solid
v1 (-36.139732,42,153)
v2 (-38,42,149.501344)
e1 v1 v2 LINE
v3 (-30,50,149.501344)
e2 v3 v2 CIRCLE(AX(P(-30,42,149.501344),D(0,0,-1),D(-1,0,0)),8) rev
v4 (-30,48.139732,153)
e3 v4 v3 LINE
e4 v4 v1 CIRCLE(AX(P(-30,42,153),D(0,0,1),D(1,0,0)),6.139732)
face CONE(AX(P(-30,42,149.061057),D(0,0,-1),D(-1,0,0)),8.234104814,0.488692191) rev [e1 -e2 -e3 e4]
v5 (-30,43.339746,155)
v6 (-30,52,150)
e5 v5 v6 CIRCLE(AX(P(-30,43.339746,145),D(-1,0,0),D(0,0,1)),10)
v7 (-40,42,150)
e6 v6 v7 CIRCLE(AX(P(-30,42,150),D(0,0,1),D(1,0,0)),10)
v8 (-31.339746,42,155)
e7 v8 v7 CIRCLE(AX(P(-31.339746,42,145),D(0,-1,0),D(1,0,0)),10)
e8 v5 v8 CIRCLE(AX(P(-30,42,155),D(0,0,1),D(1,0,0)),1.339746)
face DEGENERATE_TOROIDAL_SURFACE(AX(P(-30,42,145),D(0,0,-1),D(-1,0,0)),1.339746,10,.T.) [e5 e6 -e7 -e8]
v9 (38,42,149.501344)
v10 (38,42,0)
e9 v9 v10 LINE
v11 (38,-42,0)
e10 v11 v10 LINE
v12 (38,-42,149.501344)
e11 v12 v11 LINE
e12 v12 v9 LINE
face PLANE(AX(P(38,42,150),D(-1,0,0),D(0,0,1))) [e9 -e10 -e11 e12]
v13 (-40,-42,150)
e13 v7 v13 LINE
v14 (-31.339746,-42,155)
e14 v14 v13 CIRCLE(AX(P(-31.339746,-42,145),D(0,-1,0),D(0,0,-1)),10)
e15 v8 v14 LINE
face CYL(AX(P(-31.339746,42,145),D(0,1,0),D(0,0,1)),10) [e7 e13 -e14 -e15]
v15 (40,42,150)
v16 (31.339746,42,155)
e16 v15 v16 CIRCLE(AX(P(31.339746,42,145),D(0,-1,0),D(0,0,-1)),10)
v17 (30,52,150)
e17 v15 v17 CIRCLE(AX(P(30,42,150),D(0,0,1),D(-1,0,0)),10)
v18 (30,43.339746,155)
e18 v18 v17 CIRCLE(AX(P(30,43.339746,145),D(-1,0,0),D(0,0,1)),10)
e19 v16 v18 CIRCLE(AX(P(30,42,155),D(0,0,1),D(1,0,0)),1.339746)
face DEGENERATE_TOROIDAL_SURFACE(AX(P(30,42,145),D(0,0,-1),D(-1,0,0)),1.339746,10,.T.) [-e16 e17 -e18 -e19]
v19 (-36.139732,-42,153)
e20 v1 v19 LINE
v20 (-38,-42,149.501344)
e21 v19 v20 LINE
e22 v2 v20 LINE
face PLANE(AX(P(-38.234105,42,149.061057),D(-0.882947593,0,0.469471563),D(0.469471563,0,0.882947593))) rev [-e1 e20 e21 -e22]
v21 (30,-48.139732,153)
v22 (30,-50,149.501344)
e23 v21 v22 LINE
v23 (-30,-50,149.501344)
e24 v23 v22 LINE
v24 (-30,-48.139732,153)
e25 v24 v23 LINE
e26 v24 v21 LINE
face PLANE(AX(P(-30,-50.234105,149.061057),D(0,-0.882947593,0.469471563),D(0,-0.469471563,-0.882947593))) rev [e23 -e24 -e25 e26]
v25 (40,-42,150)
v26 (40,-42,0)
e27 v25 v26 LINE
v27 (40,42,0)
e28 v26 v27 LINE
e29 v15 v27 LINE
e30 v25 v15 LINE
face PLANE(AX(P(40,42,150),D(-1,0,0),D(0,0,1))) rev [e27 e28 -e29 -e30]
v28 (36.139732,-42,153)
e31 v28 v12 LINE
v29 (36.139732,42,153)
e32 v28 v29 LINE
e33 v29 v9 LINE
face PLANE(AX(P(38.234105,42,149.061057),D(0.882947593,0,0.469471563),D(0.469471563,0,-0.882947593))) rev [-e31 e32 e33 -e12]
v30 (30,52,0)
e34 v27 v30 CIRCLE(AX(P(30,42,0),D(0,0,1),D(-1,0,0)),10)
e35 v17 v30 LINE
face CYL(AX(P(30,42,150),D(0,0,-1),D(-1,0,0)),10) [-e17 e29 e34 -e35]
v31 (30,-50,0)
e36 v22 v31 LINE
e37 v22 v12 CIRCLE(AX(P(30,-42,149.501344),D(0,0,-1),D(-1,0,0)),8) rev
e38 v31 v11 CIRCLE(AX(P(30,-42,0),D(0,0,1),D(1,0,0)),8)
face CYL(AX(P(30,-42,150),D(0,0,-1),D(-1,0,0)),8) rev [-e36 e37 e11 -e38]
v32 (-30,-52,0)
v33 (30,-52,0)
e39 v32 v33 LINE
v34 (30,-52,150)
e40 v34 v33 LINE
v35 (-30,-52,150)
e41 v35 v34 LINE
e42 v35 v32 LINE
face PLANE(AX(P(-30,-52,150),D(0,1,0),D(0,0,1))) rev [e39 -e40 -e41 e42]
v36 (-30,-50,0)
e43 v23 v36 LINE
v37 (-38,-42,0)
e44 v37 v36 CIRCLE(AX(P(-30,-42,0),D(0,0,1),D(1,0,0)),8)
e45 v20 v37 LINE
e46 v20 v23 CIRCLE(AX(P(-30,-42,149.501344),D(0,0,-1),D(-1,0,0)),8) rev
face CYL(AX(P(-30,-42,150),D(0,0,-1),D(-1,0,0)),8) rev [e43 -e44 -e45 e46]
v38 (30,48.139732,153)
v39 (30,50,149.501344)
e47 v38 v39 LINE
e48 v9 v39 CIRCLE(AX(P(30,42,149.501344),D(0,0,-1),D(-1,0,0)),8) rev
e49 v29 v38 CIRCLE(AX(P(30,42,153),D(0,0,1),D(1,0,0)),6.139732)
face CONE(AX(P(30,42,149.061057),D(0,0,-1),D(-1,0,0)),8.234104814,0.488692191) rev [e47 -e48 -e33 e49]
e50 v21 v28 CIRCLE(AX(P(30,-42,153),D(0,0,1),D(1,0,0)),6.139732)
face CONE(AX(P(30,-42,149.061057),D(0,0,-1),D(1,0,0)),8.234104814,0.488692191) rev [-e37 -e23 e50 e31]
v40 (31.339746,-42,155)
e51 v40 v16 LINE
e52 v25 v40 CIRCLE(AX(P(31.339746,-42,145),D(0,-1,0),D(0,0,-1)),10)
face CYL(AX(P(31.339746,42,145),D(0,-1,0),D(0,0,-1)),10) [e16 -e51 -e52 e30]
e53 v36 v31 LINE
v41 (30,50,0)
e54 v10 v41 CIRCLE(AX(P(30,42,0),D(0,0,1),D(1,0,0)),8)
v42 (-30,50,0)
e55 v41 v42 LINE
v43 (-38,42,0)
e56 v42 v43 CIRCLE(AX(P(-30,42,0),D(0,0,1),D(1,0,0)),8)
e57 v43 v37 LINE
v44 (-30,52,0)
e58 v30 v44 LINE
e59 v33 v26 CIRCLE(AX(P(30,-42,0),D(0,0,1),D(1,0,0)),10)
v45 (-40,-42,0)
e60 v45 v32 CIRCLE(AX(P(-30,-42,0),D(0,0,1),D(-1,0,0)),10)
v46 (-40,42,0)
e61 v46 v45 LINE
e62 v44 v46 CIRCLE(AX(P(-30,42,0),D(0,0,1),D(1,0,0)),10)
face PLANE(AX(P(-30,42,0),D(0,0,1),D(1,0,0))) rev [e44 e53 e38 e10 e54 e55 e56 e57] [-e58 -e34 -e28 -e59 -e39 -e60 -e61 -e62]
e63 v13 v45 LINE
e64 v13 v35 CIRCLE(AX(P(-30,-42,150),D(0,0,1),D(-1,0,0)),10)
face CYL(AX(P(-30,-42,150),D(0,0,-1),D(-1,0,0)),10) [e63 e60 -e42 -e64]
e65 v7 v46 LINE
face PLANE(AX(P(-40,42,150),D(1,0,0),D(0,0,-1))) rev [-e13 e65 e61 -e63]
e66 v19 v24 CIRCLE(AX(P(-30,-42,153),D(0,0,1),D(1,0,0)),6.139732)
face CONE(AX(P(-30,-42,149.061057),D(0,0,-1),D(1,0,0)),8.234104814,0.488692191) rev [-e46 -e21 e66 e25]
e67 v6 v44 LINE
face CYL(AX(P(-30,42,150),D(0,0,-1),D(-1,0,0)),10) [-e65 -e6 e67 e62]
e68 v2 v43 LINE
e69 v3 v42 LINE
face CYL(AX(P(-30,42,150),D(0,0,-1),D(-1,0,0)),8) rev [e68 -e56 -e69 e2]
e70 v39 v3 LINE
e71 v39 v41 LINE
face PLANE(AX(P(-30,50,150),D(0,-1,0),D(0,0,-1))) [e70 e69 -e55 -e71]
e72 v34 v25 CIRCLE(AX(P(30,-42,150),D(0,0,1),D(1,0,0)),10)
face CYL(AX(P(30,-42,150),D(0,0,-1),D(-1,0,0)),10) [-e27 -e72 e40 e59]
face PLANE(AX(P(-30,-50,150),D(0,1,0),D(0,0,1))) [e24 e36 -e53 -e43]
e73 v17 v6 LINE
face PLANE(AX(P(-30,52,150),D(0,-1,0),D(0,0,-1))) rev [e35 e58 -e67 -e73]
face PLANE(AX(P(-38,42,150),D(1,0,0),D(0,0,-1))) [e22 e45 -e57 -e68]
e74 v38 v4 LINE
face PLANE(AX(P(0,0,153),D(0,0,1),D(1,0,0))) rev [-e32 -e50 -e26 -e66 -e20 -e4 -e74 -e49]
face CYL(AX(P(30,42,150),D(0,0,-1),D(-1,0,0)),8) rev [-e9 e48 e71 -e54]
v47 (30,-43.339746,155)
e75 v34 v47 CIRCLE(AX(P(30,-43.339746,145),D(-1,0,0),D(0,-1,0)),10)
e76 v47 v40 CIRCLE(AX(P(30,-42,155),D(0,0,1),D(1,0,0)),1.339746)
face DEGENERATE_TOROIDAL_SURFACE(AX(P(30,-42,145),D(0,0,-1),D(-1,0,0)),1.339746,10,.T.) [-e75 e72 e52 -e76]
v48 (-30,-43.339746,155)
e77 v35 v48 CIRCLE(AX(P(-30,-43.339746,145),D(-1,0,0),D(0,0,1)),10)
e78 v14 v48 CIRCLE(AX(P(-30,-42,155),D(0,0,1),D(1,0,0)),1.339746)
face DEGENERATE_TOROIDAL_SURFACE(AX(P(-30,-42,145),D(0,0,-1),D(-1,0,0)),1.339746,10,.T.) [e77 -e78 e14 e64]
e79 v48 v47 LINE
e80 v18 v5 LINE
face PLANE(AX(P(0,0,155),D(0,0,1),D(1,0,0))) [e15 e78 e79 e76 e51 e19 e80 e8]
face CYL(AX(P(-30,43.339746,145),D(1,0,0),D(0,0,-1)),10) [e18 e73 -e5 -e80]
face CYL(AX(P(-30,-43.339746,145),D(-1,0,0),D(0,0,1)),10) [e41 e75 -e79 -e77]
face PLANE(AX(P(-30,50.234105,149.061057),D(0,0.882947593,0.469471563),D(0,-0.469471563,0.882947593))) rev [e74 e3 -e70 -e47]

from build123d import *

# Parameters (mm, degrees)
EXTRUDE_1_DEPTH = 150
EXTRUDE_3_DEPTH = 5
EXTRUDE_3_TAPER = 28
SHELL_9_T       = -2
FILLET_22_R     = 10


with BuildPart() as part:
    # 草圖1 → 填料-伸長1 (new body)
    with BuildSketch(Plane.XY):
        with BuildLine():
            Line((-30, 52), (30, 52))
            ThreePointArc((30, 52), (37.071067812, 49.071067812), (40, 42))
            Line((40, 42), (40, -42))
            ThreePointArc((40, -42), (37.071067812, -49.071067812), (30, -52))
            Line((30, -52), (-30, -52))
            ThreePointArc((-30, -52), (-37.071067812, -49.071067812), (-40, -42))
            Line((-40, -42), (-40, 42))
            ThreePointArc((-40, 42), (-37.071067812, 49.071067812), (-30, 52))
        make_face()
    extrude(amount=EXTRUDE_1_DEPTH)

    # 草圖3 → 填料-伸長3 (add)
    with BuildSketch(Plane.XY.offset(150)):
        with BuildLine():
            ThreePointArc((-30, 52), (-37.071067812, 49.071067812), (-40, 42))
            Line((-40, 42), (-40, -42))
            ThreePointArc((-40, -42), (-37.071067812, -49.071067812), (-30, -52))
            Line((-30, -52), (30, -52))
            ThreePointArc((30, -52), (37.071067812, -49.071067812), (40, -42))
            Line((40, -42), (40, 42))
            ThreePointArc((40, 42), (37.071067812, 49.071067812), (30, 52))
            Line((30, 52), (-30, 52))
        make_face()
    extrude(amount=EXTRUDE_3_DEPTH, taper=EXTRUDE_3_TAPER)

    # 薄殼9
    shell_9_openings = [part.faces().sort_by_distance(p)[0] for p in [
        (0, 0, 0),
    ]]
    offset(amount=SHELL_9_T, openings=shell_9_openings, kind=Kind.INTERSECTION)

    # 圓角22
    # the kernel refuses this fillet: 10 mm, written as the material it takes off along each edge
    with BuildSketch(Plane(origin=(-30, -42, 155), x_dir=(-1, 0, 0), z_dir=(0, 1, 0))) as fillet_22_piece_1:
        with BuildLine():
            CenterArc((1.339745962, -10), FILLET_22_R, 30, 60)
            Line((10, -5), (10.173205081, -4.9))
            ThreePointArc((10.173205081, -4.9), (8.847315939, -2.406105687), (7.51804236, 0.093894313))
            Line((7.51804236, 0.093894313), (7.341452842, 0.2))
            Line((7.341452842, 0.2), (1.339745962, 0.2))
            Line((1.339745962, 0.2), (1.339745962, 0))
        make_face()
    revolve(axis=Axis((-30, -42, 155), (0, 0, 1)), revolution_arc=90, mode=Mode.SUBTRACT)
    with BuildSketch(Plane(origin=(-37.341452842, 42, 155), x_dir=(1, 0, 0), z_dir=(0, -1, 0)), Plane(origin=(37.341452842, -42, 155), x_dir=(-1, 0, 0), z_dir=(0, 1, 0))) as fillet_22_piece_2:
        with BuildLine():
            CenterArc((6.00170688, -10), FILLET_22_R, 90, 60)
            Line((-2.658547158, -5), (-2.831752239, -4.9))
            ThreePointArc((-2.831752239, -4.9), (-1.505863098, -2.406105687), (-0.176589519, 0.093894313))
            Line((-0.176589519, 0.093894313), (0, 0.2))
            Line((0, 0.2), (6.00170688, 0.2))
            Line((6.00170688, 0.2), (6.00170688, 0))
        make_face()
    extrude(amount=84, mode=Mode.SUBTRACT)
    with BuildSketch(Plane(origin=(-30, 42, 155), x_dir=(0, 1, 0), z_dir=(1, 0, 0))) as fillet_22_piece_3:
        with BuildLine():
            CenterArc((1.339745962, -10), FILLET_22_R, 30, 60)
            Line((1.339745962, 0), (1.339745962, 0.2))
            Line((1.339745962, 0.2), (7.341452842, 0.2))
            Line((7.341452842, 0.2), (7.51804236, 0.093894313))
            ThreePointArc((7.51804236, 0.093894313), (8.847315939, -2.406105687), (10.173205081, -4.9))
            Line((10.173205081, -4.9), (10, -5))
        make_face()
    revolve(axis=Axis((-30, 42, 155), (0, 0, 1)), revolution_arc=90, mode=Mode.SUBTRACT)
    with BuildSketch(Plane(origin=(30, 49.341452842, 155), x_dir=(0, 0.46947156278588964, -0.8829475928589275), z_dir=(-1, 0, 0))) as fillet_22_piece_4:
        with BuildLine():
            CenterArc((6.01184522, 9.99390827), FILLET_22_R, 208, 60)
            Line((-2.817630708, 5.299192642), (-2.994220227, 5.20529833))
            Line((-2.994220227, 5.20529833), (-0.176589519, -0.093894313))
            Line((-0.176589519, -0.093894313), (0, -0.2))
            ThreePointArc((0, -0.2), (2.831425127, -0.2), (5.655870354, -0.199878165))
            Line((5.655870354, -0.199878165), (5.662850253, 0))
        make_face()
    extrude(amount=60, mode=Mode.SUBTRACT)
    with BuildSketch(Plane(origin=(30, 42, 155), x_dir=(1, 0, 0), z_dir=(0, -1, 0))) as fillet_22_piece_5:
        with BuildLine():
            CenterArc((1.339745962, -10), FILLET_22_R, 30, 60)
            Line((1.339745962, 0), (1.339745962, 0.2))
            Line((1.339745962, 0.2), (7.341452842, 0.2))
            Line((7.341452842, 0.2), (7.51804236, 0.093894313))
            ThreePointArc((7.51804236, 0.093894313), (8.847315939, -2.406105687), (10.173205081, -4.9))
            Line((10.173205081, -4.9), (10, -5))
        make_face()
    revolve(axis=Axis((30, 42, 155), (0, 0, 1)), revolution_arc=90, mode=Mode.SUBTRACT)
    with BuildSketch(Plane(origin=(30, -42, 155), x_dir=(0, -1, 0), z_dir=(-1, 0, 0))) as fillet_22_piece_6:
        with BuildLine():
            CenterArc((1.339745962, -10), FILLET_22_R, 30, 60)
            Line((10, -5), (10.173205081, -4.9))
            ThreePointArc((10.173205081, -4.9), (8.847315939, -2.406105687), (7.51804236, 0.093894313))
            Line((7.51804236, 0.093894313), (7.341452842, 0.2))
            Line((7.341452842, 0.2), (1.339745962, 0.2))
            Line((1.339745962, 0.2), (1.339745962, 0))
        make_face()
    revolve(axis=Axis((30, -42, 155), (0, 0, 1)), revolution_arc=90, mode=Mode.SUBTRACT)
    with BuildSketch(Plane(origin=(-30, -49.341452842, 155), x_dir=(0, 1, 0), z_dir=(1, 0, 0))) as fillet_22_piece_7:
        with BuildLine():
            CenterArc((6.00170688, -10), FILLET_22_R, 90, 60)
            Line((-2.658547158, -5), (-2.831752239, -4.9))
            ThreePointArc((-2.831752239, -4.9), (-1.505863098, -2.406105687), (-0.176589519, 0.093894313))
            Line((-0.176589519, 0.093894313), (0, 0.2))
            Line((0, 0.2), (6.00170688, 0.2))
            Line((6.00170688, 0.2), (6.00170688, 0))
        make_face()
    extrude(amount=60, mode=Mode.SUBTRACT)


solid = part.part
